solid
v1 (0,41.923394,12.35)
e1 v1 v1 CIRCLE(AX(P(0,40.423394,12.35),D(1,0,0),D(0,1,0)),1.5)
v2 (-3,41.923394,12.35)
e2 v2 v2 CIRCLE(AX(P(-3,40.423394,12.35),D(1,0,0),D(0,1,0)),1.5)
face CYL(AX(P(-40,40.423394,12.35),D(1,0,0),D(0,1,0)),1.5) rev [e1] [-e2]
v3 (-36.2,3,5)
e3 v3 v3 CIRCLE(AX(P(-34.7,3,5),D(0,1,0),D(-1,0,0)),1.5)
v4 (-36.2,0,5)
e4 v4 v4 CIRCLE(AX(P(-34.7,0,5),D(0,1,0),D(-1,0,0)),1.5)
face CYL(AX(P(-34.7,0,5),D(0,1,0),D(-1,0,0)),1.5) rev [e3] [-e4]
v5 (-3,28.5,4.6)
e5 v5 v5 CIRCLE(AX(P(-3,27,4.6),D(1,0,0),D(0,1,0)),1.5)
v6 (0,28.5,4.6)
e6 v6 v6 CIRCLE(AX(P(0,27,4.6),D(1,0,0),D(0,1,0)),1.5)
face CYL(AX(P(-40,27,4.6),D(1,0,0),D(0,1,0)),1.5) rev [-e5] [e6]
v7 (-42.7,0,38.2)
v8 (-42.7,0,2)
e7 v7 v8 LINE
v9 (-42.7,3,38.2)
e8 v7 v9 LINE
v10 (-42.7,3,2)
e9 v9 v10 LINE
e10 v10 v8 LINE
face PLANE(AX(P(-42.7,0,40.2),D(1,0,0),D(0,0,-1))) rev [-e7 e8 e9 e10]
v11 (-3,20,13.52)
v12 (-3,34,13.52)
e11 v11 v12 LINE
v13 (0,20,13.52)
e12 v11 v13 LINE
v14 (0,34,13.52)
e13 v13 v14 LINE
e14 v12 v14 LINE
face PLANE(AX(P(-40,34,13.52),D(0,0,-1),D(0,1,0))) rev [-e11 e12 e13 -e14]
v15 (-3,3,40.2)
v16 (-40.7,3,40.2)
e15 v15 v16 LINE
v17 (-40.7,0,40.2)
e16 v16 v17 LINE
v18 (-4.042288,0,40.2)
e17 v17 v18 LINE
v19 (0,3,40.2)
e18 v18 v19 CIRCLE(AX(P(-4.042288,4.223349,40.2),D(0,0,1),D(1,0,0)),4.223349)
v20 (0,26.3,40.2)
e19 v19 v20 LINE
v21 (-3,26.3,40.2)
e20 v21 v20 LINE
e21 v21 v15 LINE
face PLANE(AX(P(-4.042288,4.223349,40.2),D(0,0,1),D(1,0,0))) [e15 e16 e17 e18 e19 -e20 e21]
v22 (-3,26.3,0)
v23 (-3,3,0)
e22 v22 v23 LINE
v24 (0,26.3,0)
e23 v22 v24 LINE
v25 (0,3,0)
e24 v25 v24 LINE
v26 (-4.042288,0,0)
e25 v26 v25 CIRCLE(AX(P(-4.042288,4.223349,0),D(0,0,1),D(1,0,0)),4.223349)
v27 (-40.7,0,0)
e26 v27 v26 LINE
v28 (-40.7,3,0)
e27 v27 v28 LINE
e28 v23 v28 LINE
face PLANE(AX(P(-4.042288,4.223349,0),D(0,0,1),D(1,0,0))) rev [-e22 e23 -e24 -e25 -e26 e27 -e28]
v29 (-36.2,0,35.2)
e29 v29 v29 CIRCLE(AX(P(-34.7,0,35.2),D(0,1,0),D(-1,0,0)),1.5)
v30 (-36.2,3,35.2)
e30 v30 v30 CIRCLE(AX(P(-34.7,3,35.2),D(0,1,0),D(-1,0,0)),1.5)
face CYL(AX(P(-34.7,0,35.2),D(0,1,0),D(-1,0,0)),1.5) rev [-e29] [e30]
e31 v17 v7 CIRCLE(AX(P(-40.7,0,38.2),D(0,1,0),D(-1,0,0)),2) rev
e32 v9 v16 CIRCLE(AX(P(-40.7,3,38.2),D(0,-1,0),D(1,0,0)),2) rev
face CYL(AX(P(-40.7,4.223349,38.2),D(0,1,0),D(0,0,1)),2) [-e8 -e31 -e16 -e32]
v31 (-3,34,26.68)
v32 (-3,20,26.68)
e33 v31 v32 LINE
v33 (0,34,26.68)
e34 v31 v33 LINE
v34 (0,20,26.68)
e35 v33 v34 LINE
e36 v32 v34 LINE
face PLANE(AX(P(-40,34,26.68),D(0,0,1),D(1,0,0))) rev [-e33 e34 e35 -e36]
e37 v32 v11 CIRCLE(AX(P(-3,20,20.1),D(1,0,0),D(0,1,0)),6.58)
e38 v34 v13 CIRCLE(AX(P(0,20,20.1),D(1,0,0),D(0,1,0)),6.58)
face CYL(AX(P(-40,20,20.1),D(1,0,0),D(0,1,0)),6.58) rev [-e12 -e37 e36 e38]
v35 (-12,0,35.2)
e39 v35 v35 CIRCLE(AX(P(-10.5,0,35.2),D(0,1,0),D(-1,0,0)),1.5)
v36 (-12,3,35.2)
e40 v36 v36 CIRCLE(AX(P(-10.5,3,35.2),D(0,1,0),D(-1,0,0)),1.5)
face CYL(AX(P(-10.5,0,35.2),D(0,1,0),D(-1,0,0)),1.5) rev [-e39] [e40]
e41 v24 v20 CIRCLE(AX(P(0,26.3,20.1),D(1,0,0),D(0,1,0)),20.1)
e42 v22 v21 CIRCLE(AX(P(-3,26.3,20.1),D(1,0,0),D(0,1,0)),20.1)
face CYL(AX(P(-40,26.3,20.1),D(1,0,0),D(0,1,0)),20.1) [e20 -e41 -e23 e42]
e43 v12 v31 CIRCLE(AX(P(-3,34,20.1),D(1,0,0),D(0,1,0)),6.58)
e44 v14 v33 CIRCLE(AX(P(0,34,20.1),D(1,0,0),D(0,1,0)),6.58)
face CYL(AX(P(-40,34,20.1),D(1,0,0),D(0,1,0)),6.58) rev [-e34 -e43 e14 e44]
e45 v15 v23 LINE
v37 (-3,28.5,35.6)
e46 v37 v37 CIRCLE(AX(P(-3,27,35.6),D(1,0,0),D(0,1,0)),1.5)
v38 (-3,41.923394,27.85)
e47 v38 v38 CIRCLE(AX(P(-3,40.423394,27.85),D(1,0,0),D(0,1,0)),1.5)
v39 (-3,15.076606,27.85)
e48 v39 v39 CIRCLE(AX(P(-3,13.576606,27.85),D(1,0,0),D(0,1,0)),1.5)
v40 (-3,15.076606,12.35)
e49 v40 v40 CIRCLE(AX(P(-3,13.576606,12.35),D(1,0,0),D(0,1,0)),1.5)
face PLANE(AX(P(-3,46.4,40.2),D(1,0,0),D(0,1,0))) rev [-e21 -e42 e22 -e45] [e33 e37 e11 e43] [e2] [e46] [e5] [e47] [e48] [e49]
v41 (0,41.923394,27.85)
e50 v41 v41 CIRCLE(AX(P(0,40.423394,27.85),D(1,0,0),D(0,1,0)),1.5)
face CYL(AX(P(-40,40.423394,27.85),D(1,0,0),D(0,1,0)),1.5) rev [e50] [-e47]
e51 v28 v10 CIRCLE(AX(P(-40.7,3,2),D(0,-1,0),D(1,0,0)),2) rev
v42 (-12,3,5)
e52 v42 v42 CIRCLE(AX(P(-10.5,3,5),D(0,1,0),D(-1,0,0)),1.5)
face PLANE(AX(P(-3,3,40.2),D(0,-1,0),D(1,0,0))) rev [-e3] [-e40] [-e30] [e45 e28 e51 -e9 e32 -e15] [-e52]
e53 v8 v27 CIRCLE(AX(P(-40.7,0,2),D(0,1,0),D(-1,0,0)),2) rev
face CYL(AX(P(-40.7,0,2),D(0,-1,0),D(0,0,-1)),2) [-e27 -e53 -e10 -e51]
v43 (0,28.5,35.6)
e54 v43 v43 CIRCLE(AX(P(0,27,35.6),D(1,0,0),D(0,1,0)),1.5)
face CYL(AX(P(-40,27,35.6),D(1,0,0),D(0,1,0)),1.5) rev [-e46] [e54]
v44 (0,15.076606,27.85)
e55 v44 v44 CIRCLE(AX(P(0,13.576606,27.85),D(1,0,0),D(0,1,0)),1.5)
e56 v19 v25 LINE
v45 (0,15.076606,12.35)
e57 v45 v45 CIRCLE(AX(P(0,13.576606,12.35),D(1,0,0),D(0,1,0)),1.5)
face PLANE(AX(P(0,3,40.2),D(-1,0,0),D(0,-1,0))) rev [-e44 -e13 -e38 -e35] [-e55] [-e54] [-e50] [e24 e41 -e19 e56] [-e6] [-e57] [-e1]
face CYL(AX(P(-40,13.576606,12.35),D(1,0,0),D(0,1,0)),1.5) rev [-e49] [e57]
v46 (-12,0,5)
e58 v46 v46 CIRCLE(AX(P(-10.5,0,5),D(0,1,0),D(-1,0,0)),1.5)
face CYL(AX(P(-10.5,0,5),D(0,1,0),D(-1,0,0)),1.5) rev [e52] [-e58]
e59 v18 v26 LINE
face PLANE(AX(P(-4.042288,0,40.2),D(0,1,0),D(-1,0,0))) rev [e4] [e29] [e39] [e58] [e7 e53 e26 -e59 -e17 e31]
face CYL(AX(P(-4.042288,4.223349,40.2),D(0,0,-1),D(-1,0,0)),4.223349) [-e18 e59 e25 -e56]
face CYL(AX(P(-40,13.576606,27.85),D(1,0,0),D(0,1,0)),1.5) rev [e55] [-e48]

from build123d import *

# Parameters (mm, degrees)
BOSS_EXTRUDE1_DEPTH = 40.2
CUT_EXTRUDE1_START  = -3
CUT_EXTRUDE1_DEPTH  = 3
CUT_EXTRUDE4_DEPTH  = 40
SKETCH8_R           = 1.5
CUT_EXTRUDE5_DEPTH  = 40
FILLET2_R           = 2
SKETCH5_R           = 1.5
CUT_EXTRUDE6_DEPTH  = 73.958138682


# Read off the part's stored shape, not the designer's step: Cut-Extrude1
with BuildPart() as part:
    # Sketch1 → Boss-Extrude1 (new body)
    with BuildSketch(Plane.XY):
        with BuildLine():
            Line((-4.042288133, 0), (-42.7, 0))
            Line((-42.7, 0), (-42.7, 3))
            Line((-42.7, 3), (-3, 3))
            Line((-3, 3), (-3, 46.4))
            Line((-3, 46.4), (0, 46.4))
            Line((0, 46.4), (0, 3))
            ThreePointArc((0, 3), (-1.525340907, 0.831940258), (-4.042288133, 0))
        make_face()
    extrude(amount=BOSS_EXTRUDE1_DEPTH)

    # Cut-Extrude1 outline → Cut-Extrude1 (cut)
    with BuildSketch(Plane(origin=(0, 0, 0), x_dir=(0, 0, -1), z_dir=(1, 0, 0)).offset(CUT_EXTRUDE1_START)):
        with BuildLine():
            ThreePointArc((-40.2, 26.3), (-34.312846302, 40.512846302), (-20.1, 46.4))
            Line((-20.1, 46.4), (-40.2, 46.4))
            Line((-40.2, 46.4), (-40.2, 26.3))
        make_face()
        with BuildLine():
            ThreePointArc((-20.1, 46.4), (-5.887153698, 40.512846302), (0, 26.3))
            Line((0, 26.3), (0, 46.4))
            Line((0, 46.4), (-20.1, 46.4))
        make_face()
    extrude(amount=CUT_EXTRUDE1_DEPTH, mode=Mode.SUBTRACT)

    # Sketch7 → Cut-Extrude4 (cut)
    with BuildSketch(Plane(origin=(0, 0, 0), x_dir=(0, 0, -1), z_dir=(1, 0, 0))):
        with BuildLine():
            Line((-26.68, 34), (-26.68, 20))
            ThreePointArc((-26.68, 20), (-20.1, 13.42), (-13.52, 20))
            Line((-13.52, 20), (-13.52, 34))
            ThreePointArc((-13.52, 34), (-20.1, 40.58), (-26.68, 34))
        make_face()
    extrude(amount=-CUT_EXTRUDE4_DEPTH, mode=Mode.SUBTRACT)

    # Sketch8 → Cut-Extrude5 (cut)
    with BuildSketch(Plane(origin=(0, 0, 0), x_dir=(0, 0, -1), z_dir=(1, 0, 0))):
        with Locations(Location((-35.6, 27, 0), (0, 0, 90))):
            Circle(SKETCH8_R)
        with Locations(Location((-27.85, 40.423393759, 0), (0, 0, 90))):
            Circle(SKETCH8_R)
        with Locations(Location((-12.35, 40.423393759, 0), (0, 0, 90))):
            Circle(SKETCH8_R)
        with Locations(Location((-4.6, 27, 0), (0, 0, 90))):
            Circle(SKETCH8_R)
        with Locations(Location((-12.35, 13.576606241, 0), (0, 0, 90))):
            Circle(SKETCH8_R)
        with Locations(Location((-27.85, 13.576606241, 0), (0, 0, 90))):
            Circle(SKETCH8_R)
    extrude(amount=-CUT_EXTRUDE5_DEPTH, mode=Mode.SUBTRACT)

    # Fillet2
    fillet2_edges = [part.edges().sort_by_distance(p)[0] for p in [
        (-42.7, 1.5, 40.2),
        (-42.7, 1.5, 0),
    ]]
    fillet(fillet2_edges, radius=FILLET2_R)

    # Sketch5 → Cut-Extrude6 (cut, through all)
    with BuildSketch(Plane(origin=(0, 3, 0), x_dir=(1, 0, 0), z_dir=(0, 1, 0))):
        with Locations(Location((-10.5, -5, 0), (0, 0, 180))):
            Circle(SKETCH5_R)
        with Locations(Location((-10.5, -35.2, 0), (0, 0, 180))):
            Circle(SKETCH5_R)
        with Locations(Location((-34.7, -35.2, 0), (0, 0, 180))):
            Circle(SKETCH5_R)
        with Locations(Location((-34.7, -5, 0), (0, 0, 180))):
            Circle(SKETCH5_R)
    extrude(amount=-CUT_EXTRUDE6_DEPTH, mode=Mode.SUBTRACT)


solid = part.part
